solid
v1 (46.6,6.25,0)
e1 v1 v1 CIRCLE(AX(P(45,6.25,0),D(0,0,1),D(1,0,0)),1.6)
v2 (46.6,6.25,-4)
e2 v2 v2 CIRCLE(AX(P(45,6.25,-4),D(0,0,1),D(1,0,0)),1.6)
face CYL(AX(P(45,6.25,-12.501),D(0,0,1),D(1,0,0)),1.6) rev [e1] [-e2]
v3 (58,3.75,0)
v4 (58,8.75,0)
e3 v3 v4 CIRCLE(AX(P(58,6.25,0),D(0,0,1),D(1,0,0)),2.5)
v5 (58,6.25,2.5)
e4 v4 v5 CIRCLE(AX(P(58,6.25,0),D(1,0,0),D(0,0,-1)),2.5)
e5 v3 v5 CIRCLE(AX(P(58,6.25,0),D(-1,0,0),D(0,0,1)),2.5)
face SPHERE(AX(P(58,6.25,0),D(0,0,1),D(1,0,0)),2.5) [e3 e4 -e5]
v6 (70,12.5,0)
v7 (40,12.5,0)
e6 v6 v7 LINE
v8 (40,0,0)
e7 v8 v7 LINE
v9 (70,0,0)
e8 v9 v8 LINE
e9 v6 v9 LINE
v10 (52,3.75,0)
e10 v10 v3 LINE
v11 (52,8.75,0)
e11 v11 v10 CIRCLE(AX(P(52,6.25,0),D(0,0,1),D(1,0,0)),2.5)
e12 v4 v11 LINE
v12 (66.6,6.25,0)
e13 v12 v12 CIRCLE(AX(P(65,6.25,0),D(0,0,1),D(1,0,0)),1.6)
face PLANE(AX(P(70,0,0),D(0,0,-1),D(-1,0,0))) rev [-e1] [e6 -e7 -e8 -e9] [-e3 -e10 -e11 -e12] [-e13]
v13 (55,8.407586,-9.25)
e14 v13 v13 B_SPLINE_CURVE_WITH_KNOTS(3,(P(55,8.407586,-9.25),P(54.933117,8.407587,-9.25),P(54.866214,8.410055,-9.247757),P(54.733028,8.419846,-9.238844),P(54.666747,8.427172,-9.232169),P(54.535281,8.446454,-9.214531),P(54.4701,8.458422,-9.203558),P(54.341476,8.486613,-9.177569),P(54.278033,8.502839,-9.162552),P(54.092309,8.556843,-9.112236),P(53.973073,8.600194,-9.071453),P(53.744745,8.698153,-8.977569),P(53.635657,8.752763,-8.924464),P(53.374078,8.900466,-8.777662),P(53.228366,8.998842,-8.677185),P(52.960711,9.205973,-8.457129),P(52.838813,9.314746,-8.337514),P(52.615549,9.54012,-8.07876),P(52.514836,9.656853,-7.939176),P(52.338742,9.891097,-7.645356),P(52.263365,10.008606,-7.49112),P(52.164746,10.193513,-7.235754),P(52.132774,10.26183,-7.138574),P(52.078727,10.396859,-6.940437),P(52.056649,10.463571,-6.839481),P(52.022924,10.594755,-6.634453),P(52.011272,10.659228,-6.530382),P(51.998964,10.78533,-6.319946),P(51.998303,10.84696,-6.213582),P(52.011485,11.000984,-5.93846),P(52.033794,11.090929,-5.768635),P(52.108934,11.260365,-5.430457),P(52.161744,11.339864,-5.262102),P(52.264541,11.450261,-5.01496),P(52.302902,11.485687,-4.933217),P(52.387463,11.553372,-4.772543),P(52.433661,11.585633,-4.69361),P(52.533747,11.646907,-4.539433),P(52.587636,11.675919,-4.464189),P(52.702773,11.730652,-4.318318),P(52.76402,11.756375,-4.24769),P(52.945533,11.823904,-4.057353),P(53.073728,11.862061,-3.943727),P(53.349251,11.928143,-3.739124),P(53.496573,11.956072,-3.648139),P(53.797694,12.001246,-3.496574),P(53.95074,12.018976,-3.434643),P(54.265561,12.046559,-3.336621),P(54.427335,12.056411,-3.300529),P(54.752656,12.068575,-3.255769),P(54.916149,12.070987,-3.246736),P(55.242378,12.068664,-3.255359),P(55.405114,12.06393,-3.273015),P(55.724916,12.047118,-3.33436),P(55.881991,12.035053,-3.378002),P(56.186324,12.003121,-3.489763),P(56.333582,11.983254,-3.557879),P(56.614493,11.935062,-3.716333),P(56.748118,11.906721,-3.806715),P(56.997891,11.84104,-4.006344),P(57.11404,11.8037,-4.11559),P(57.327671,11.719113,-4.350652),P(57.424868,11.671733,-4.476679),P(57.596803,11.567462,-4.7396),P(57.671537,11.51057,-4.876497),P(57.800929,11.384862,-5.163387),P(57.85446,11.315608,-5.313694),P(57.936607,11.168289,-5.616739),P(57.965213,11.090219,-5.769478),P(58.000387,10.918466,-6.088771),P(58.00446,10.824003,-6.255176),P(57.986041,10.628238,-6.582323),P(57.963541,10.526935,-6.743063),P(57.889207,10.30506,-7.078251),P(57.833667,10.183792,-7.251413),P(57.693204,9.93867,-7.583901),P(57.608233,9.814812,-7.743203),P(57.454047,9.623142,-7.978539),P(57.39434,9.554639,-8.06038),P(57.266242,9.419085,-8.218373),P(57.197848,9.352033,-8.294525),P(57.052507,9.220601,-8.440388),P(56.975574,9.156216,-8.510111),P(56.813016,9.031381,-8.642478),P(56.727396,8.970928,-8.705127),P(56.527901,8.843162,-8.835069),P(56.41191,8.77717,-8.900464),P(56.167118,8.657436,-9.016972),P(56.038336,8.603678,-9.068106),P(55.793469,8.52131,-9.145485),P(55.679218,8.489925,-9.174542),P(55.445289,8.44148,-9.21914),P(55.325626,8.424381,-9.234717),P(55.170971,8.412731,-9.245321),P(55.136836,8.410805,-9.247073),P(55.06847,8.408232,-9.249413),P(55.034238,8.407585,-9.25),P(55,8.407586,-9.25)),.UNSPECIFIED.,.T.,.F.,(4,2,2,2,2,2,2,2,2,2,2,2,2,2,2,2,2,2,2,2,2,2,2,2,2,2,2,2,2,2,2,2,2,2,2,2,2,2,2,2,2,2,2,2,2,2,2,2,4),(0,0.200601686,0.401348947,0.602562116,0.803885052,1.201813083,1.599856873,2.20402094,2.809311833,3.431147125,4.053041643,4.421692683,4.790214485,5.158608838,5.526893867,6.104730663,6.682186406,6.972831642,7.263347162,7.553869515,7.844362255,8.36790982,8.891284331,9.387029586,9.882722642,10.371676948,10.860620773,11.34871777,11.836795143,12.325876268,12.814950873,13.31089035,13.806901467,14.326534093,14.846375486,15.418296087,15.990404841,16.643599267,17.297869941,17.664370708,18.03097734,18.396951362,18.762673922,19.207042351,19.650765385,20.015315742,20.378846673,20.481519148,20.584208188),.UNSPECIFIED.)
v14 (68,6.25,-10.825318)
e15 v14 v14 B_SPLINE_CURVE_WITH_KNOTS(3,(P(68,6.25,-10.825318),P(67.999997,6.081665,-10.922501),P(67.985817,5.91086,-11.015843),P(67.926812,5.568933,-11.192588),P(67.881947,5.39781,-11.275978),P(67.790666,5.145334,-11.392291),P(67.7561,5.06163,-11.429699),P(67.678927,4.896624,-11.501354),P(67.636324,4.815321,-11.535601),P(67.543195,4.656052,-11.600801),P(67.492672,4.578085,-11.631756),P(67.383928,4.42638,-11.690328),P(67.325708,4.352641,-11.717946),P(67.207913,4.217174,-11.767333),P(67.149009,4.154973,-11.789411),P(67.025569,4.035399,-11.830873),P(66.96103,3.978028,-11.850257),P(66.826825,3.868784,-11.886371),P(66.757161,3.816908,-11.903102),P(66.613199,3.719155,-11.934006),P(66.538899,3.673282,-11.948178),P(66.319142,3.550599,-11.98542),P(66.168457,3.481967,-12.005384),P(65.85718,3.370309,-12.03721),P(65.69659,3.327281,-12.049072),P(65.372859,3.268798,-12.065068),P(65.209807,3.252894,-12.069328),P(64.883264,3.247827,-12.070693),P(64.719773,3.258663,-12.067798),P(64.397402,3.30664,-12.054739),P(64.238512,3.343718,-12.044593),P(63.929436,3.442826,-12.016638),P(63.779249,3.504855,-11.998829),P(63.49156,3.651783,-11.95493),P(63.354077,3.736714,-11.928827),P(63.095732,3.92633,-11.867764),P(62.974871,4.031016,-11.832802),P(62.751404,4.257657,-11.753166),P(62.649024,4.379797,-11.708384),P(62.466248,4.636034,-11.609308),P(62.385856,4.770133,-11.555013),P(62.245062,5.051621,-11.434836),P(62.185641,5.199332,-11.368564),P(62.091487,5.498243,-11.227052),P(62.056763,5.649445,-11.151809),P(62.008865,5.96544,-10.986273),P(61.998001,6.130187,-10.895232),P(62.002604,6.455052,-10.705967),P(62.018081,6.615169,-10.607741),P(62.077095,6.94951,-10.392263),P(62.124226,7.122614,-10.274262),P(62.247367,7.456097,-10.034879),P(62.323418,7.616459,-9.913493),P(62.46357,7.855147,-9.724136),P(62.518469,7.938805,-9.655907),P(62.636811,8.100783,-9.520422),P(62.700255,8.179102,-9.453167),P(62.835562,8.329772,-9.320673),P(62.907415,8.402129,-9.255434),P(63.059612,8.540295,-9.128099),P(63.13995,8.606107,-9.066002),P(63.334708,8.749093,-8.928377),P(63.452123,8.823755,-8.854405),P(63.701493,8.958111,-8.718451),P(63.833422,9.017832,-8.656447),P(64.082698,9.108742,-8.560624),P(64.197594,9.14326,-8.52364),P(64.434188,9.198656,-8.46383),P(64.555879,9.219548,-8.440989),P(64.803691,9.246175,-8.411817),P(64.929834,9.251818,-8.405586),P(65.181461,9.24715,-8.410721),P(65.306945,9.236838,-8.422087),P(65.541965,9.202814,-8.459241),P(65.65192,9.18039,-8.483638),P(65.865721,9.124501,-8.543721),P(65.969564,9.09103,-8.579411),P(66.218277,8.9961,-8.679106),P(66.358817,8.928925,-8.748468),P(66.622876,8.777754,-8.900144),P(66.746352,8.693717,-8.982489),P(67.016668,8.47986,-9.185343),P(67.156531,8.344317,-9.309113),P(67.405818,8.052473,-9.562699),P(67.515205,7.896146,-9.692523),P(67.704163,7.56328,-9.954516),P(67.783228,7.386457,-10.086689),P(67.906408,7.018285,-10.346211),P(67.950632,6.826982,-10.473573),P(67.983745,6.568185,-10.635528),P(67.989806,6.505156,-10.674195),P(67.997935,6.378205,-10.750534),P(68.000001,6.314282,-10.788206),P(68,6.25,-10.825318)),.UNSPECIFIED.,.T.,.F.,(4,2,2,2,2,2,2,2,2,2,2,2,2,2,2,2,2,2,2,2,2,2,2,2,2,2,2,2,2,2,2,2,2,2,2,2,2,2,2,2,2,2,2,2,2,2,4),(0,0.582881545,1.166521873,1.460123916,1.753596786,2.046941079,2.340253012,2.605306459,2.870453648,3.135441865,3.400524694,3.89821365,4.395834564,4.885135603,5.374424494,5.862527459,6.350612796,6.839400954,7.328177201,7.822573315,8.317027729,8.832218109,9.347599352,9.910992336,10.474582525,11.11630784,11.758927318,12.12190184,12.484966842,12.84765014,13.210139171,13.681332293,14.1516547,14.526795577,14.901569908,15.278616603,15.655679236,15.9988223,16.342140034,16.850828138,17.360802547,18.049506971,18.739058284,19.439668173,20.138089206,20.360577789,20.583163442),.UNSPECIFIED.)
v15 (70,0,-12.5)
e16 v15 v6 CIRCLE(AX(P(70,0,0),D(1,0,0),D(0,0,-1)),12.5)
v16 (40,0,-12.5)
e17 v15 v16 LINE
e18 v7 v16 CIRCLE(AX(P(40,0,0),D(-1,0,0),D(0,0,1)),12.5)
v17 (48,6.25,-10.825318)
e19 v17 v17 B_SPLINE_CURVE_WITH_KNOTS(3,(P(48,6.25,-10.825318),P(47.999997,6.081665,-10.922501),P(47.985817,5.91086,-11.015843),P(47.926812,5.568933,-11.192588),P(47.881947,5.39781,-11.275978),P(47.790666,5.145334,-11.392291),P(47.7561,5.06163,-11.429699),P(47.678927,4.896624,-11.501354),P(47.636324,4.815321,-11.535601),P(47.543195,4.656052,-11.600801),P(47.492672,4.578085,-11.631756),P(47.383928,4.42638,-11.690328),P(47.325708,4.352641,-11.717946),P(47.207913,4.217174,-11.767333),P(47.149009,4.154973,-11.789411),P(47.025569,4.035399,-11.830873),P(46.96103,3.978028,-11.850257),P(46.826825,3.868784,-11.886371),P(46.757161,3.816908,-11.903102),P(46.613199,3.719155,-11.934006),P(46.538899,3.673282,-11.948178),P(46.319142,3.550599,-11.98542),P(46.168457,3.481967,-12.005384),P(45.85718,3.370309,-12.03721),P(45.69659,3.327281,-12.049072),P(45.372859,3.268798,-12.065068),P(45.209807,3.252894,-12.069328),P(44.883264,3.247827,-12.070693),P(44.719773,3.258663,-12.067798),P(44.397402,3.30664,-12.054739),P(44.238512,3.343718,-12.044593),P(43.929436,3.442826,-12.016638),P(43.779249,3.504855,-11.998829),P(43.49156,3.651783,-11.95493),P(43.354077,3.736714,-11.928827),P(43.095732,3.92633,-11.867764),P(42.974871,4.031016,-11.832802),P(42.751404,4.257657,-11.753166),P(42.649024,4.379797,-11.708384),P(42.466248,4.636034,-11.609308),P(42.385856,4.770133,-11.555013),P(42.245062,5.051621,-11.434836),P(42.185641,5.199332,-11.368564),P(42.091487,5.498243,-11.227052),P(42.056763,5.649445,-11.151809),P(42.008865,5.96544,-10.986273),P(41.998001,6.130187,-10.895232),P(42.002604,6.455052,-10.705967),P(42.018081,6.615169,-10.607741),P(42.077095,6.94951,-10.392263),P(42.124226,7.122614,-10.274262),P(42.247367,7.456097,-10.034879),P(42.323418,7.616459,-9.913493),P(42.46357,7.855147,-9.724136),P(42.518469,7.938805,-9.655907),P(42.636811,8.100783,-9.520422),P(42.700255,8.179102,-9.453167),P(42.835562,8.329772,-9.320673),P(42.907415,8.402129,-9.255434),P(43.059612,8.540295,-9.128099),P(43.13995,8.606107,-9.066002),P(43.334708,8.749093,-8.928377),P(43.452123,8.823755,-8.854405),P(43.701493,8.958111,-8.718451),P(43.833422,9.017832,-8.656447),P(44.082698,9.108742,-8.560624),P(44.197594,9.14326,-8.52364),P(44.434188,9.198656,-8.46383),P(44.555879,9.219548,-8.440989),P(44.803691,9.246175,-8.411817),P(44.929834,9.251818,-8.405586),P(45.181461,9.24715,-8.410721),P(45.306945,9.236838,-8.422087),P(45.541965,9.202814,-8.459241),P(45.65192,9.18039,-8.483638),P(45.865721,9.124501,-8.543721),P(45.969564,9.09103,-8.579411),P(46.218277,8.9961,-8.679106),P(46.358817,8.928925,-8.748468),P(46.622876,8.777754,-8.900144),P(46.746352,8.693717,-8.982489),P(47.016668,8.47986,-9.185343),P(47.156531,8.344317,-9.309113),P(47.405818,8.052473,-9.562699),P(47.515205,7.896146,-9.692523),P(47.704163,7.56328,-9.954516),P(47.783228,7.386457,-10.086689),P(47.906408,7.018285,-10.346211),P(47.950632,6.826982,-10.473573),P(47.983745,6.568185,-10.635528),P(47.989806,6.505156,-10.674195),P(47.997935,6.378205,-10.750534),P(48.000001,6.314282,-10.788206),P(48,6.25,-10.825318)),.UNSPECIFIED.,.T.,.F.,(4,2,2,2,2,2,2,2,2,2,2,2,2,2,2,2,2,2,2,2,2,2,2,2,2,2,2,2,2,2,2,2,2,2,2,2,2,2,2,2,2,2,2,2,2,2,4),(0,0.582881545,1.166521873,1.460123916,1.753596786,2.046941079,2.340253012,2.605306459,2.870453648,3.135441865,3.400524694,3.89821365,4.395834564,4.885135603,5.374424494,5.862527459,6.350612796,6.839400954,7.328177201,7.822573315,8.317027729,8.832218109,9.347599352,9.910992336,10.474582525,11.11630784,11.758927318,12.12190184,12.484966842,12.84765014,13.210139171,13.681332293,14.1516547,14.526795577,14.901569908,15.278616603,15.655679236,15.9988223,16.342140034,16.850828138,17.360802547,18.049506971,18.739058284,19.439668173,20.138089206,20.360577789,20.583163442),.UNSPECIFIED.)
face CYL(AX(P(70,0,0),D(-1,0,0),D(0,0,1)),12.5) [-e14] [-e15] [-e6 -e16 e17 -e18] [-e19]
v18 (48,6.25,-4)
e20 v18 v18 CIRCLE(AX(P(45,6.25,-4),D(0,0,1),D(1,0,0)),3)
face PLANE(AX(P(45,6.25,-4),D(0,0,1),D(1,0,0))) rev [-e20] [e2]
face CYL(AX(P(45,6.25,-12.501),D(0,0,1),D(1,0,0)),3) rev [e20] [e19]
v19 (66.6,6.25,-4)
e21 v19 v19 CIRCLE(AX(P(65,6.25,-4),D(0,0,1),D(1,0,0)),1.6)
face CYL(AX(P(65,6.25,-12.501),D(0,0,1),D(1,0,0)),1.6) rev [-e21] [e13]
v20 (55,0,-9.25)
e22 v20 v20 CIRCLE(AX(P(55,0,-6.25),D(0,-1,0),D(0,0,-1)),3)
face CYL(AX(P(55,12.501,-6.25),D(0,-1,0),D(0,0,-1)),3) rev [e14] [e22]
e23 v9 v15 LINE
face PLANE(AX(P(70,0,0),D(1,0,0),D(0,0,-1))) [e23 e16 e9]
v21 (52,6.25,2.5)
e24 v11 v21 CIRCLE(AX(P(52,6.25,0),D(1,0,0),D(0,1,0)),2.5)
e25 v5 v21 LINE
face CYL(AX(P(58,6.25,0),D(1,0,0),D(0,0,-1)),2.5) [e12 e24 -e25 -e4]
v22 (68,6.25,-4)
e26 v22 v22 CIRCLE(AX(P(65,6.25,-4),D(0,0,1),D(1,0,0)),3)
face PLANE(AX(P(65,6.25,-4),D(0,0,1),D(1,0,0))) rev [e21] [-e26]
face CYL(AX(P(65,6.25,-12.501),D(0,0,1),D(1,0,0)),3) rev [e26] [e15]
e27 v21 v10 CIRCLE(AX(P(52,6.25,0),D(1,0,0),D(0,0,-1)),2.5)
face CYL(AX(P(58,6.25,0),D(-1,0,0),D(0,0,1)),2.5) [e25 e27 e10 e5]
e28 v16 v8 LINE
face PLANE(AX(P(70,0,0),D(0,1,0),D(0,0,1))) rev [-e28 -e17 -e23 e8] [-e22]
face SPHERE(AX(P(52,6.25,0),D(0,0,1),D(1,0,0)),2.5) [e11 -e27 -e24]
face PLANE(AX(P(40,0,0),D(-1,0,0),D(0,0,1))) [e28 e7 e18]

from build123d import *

# Parameters (mm, degrees)
SALIENTE_EXTRUIR1_DEPTH    = 70
CORTAR_EXTRUIR1_REACH      = 74.198
CORTAR_EXTRUIR1_END_RADIUS = 12.5
CROQUIS2_R                 = 1.6
CORTAR_EXTRUIR2_REACH      = 73.614
CORTAR_EXTRUIR2_END_RADIUS = 12.5
CROQUIS3_R                 = 3
CORTAR_EXTRUIR3_REACH      = 74.198
CORTAR_EXTRUIR3_END_RADIUS = 12.5
CROQUIS4_R                 = 3
CROQUIS6_W                 = 16.861787602
CROQUIS6_H                 = 17.380881654
CORTAR_EXTRUIR5_DEPTH      = 40
SALIENTE_EXTRUIR2_DEPTH    = 2.5
REDONDEO1_R                = 2.5


with BuildPart() as part:
    # Croquis1 → Saliente-Extruir1 (new body)
    with BuildSketch(Plane(origin=(0, 0, 0), x_dir=(0, 0, -1), z_dir=(1, 0, 0))):
        with BuildLine():
            Line((0, 0), (0, 12.5))
            ThreePointArc((0, 12.5), (8.838834765, 8.838834765), (12.5, 0))
            Line((12.5, 0), (0, 0))
        make_face()
    extrude(amount=SALIENTE_EXTRUIR1_DEPTH)

    # Cortar-Extruir1: up to this cylinder (the profile starts inside it)
    cortar_extruir1_end = Plane(origin=(35, 0, 0), z_dir=(-1, 0, 0)) * Cylinder(CORTAR_EXTRUIR1_END_RADIUS, 234.396, mode=Mode.PRIVATE)
    # Croquis2 → Cortar-Extruir1 (cut, up to the surface)
    with BuildSketch(Plane.XY, mode=Mode.PRIVATE) as cortar_extruir1_sk1:
        with Locations((5, 6.25)):
            Circle(CROQUIS2_R)
    cortar_extruir1_tool1 = extrude(cortar_extruir1_sk1.sketch, amount=-CORTAR_EXTRUIR1_REACH, mode=Mode.PRIVATE) & cortar_extruir1_end
    add(cortar_extruir1_tool1.solids().sort_by_distance((5, 6.25, 0))[0], mode=Mode.SUBTRACT)
    # Croquis2 → Cortar-Extruir1 (cut, up to the surface)
    with BuildSketch(Plane.XY, mode=Mode.PRIVATE) as cortar_extruir1_sk2:
        with Locations((25, 6.25)):
            Circle(CROQUIS2_R)
    cortar_extruir1_tool2 = extrude(cortar_extruir1_sk2.sketch, amount=-CORTAR_EXTRUIR1_REACH, mode=Mode.PRIVATE) & cortar_extruir1_end
    add(cortar_extruir1_tool2.solids().sort_by_distance((25, 6.25, 0))[0], mode=Mode.SUBTRACT)
    # Croquis2 → Cortar-Extruir1 (cut, up to the surface)
    with BuildSketch(Plane.XY, mode=Mode.PRIVATE) as cortar_extruir1_sk3:
        with Locations((45, 6.25)):
            Circle(CROQUIS2_R)
    cortar_extruir1_tool3 = extrude(cortar_extruir1_sk3.sketch, amount=-CORTAR_EXTRUIR1_REACH, mode=Mode.PRIVATE) & cortar_extruir1_end
    add(cortar_extruir1_tool3.solids().sort_by_distance((45, 6.25, 0))[0], mode=Mode.SUBTRACT)
    # Croquis2 → Cortar-Extruir1 (cut, up to the surface)
    with BuildSketch(Plane.XY, mode=Mode.PRIVATE) as cortar_extruir1_sk4:
        with Locations((65, 6.25)):
            Circle(CROQUIS2_R)
    cortar_extruir1_tool4 = extrude(cortar_extruir1_sk4.sketch, amount=-CORTAR_EXTRUIR1_REACH, mode=Mode.PRIVATE) & cortar_extruir1_end
    add(cortar_extruir1_tool4.solids().sort_by_distance((65, 6.25, 0))[0], mode=Mode.SUBTRACT)

    # Cortar-Extruir2: up to this cylinder (the profile starts inside it)
    cortar_extruir2_end = Plane(origin=(35, 0, 0), z_dir=(-1, 0, 0)) * Cylinder(CORTAR_EXTRUIR2_END_RADIUS, 233.228, mode=Mode.PRIVATE)
    # Croquis3 → Cortar-Extruir2 (cut, up to the surface)
    with BuildSketch(Plane.XY.offset(-4), mode=Mode.PRIVATE) as cortar_extruir2_sk1:
        with Locations((5, 6.25)):
            Circle(CROQUIS3_R)
    cortar_extruir2_tool1 = extrude(cortar_extruir2_sk1.sketch, amount=-CORTAR_EXTRUIR2_REACH, mode=Mode.PRIVATE) & cortar_extruir2_end
    add(cortar_extruir2_tool1.solids().sort_by_distance((5, 6.25, -4))[0], mode=Mode.SUBTRACT)
    # Croquis3 → Cortar-Extruir2 (cut, up to the surface)
    with BuildSketch(Plane.XY.offset(-4), mode=Mode.PRIVATE) as cortar_extruir2_sk2:
        with Locations((25, 6.25)):
            Circle(CROQUIS3_R)
    cortar_extruir2_tool2 = extrude(cortar_extruir2_sk2.sketch, amount=-CORTAR_EXTRUIR2_REACH, mode=Mode.PRIVATE) & cortar_extruir2_end
    add(cortar_extruir2_tool2.solids().sort_by_distance((25, 6.25, -4))[0], mode=Mode.SUBTRACT)
    # Croquis3 → Cortar-Extruir2 (cut, up to the surface)
    with BuildSketch(Plane.XY.offset(-4), mode=Mode.PRIVATE) as cortar_extruir2_sk3:
        with Locations((45, 6.25)):
            Circle(CROQUIS3_R)
    cortar_extruir2_tool3 = extrude(cortar_extruir2_sk3.sketch, amount=-CORTAR_EXTRUIR2_REACH, mode=Mode.PRIVATE) & cortar_extruir2_end
    add(cortar_extruir2_tool3.solids().sort_by_distance((45, 6.25, -4))[0], mode=Mode.SUBTRACT)
    # Croquis3 → Cortar-Extruir2 (cut, up to the surface)
    with BuildSketch(Plane.XY.offset(-4), mode=Mode.PRIVATE) as cortar_extruir2_sk4:
        with Locations((65, 6.25)):
            Circle(CROQUIS3_R)
    cortar_extruir2_tool4 = extrude(cortar_extruir2_sk4.sketch, amount=-CORTAR_EXTRUIR2_REACH, mode=Mode.PRIVATE) & cortar_extruir2_end
    add(cortar_extruir2_tool4.solids().sort_by_distance((65, 6.25, -4))[0], mode=Mode.SUBTRACT)

    # Cortar-Extruir3: up to this cylinder (the profile starts inside it)
    cortar_extruir3_end = Plane(origin=(35, 0, 0), z_dir=(-1, 0, 0)) * Cylinder(CORTAR_EXTRUIR3_END_RADIUS, 214.396, mode=Mode.PRIVATE)
    # Croquis4 → Cortar-Extruir3 (cut, up to the surface)
    with BuildSketch(Plane.XZ, mode=Mode.PRIVATE) as cortar_extruir3_sk1:
        with Locations(Location((55, -6.25, 0), (0, 0, 270))):
            Circle(CROQUIS4_R)
    cortar_extruir3_tool1 = extrude(cortar_extruir3_sk1.sketch, amount=-CORTAR_EXTRUIR3_REACH, mode=Mode.PRIVATE) & cortar_extruir3_end
    add(cortar_extruir3_tool1.solids().sort_by_distance((55, 0, -6.25))[0], mode=Mode.SUBTRACT)
    # Croquis4 → Cortar-Extruir3 (cut, up to the surface)
    with BuildSketch(Plane.XZ, mode=Mode.PRIVATE) as cortar_extruir3_sk2:
        with Locations(Location((35, -6.25, 0), (0, 0, 270))):
            Circle(CROQUIS4_R)
    cortar_extruir3_tool2 = extrude(cortar_extruir3_sk2.sketch, amount=-CORTAR_EXTRUIR3_REACH, mode=Mode.PRIVATE) & cortar_extruir3_end
    add(cortar_extruir3_tool2.solids().sort_by_distance((35, 0, -6.25))[0], mode=Mode.SUBTRACT)
    # Croquis4 → Cortar-Extruir3 (cut, up to the surface)
    with BuildSketch(Plane.XZ, mode=Mode.PRIVATE) as cortar_extruir3_sk3:
        with Locations(Location((15, -6.25, 0), (0, 0, 270))):
            Circle(CROQUIS4_R)
    cortar_extruir3_tool3 = extrude(cortar_extruir3_sk3.sketch, amount=-CORTAR_EXTRUIR3_REACH, mode=Mode.PRIVATE) & cortar_extruir3_end
    add(cortar_extruir3_tool3.solids().sort_by_distance((15, 0, -6.25))[0], mode=Mode.SUBTRACT)

    # Croquis6 → Cortar-Extruir5 (cut)
    with BuildSketch(Plane.ZY):
        with Locations((-8.430893801, 8.690440827)):
            Rectangle(CROQUIS6_W, CROQUIS6_H)
    extrude(amount=-CORTAR_EXTRUIR5_DEPTH, mode=Mode.SUBTRACT)

    # Croquis7 → Saliente-Extruir2 (add)
    with BuildSketch(Plane.XY):
        with BuildLine():
            Line((58, 8.75), (52, 8.75))
            ThreePointArc((52, 8.75), (49.5, 6.25), (52, 3.75))
            Line((52, 3.75), (58, 3.75))
            ThreePointArc((58, 3.75), (60.5, 6.25), (58, 8.75))
        make_face()
    extrude(amount=SALIENTE_EXTRUIR2_DEPTH)

    # Redondeo1
    redondeo1_edges = [part.edges().sort_by_distance(p)[0] for p in [
        (55, 3.75, 2.5),
        (49.5, 6.25, 2.5),
        (55, 8.75, 2.5),
        (60.5, 6.25, 2.5),
    ]]
    fillet(redondeo1_edges, radius=REDONDEO1_R - 0.0001)  # a hair under: the kernel refuses the full size


solid = part.part
